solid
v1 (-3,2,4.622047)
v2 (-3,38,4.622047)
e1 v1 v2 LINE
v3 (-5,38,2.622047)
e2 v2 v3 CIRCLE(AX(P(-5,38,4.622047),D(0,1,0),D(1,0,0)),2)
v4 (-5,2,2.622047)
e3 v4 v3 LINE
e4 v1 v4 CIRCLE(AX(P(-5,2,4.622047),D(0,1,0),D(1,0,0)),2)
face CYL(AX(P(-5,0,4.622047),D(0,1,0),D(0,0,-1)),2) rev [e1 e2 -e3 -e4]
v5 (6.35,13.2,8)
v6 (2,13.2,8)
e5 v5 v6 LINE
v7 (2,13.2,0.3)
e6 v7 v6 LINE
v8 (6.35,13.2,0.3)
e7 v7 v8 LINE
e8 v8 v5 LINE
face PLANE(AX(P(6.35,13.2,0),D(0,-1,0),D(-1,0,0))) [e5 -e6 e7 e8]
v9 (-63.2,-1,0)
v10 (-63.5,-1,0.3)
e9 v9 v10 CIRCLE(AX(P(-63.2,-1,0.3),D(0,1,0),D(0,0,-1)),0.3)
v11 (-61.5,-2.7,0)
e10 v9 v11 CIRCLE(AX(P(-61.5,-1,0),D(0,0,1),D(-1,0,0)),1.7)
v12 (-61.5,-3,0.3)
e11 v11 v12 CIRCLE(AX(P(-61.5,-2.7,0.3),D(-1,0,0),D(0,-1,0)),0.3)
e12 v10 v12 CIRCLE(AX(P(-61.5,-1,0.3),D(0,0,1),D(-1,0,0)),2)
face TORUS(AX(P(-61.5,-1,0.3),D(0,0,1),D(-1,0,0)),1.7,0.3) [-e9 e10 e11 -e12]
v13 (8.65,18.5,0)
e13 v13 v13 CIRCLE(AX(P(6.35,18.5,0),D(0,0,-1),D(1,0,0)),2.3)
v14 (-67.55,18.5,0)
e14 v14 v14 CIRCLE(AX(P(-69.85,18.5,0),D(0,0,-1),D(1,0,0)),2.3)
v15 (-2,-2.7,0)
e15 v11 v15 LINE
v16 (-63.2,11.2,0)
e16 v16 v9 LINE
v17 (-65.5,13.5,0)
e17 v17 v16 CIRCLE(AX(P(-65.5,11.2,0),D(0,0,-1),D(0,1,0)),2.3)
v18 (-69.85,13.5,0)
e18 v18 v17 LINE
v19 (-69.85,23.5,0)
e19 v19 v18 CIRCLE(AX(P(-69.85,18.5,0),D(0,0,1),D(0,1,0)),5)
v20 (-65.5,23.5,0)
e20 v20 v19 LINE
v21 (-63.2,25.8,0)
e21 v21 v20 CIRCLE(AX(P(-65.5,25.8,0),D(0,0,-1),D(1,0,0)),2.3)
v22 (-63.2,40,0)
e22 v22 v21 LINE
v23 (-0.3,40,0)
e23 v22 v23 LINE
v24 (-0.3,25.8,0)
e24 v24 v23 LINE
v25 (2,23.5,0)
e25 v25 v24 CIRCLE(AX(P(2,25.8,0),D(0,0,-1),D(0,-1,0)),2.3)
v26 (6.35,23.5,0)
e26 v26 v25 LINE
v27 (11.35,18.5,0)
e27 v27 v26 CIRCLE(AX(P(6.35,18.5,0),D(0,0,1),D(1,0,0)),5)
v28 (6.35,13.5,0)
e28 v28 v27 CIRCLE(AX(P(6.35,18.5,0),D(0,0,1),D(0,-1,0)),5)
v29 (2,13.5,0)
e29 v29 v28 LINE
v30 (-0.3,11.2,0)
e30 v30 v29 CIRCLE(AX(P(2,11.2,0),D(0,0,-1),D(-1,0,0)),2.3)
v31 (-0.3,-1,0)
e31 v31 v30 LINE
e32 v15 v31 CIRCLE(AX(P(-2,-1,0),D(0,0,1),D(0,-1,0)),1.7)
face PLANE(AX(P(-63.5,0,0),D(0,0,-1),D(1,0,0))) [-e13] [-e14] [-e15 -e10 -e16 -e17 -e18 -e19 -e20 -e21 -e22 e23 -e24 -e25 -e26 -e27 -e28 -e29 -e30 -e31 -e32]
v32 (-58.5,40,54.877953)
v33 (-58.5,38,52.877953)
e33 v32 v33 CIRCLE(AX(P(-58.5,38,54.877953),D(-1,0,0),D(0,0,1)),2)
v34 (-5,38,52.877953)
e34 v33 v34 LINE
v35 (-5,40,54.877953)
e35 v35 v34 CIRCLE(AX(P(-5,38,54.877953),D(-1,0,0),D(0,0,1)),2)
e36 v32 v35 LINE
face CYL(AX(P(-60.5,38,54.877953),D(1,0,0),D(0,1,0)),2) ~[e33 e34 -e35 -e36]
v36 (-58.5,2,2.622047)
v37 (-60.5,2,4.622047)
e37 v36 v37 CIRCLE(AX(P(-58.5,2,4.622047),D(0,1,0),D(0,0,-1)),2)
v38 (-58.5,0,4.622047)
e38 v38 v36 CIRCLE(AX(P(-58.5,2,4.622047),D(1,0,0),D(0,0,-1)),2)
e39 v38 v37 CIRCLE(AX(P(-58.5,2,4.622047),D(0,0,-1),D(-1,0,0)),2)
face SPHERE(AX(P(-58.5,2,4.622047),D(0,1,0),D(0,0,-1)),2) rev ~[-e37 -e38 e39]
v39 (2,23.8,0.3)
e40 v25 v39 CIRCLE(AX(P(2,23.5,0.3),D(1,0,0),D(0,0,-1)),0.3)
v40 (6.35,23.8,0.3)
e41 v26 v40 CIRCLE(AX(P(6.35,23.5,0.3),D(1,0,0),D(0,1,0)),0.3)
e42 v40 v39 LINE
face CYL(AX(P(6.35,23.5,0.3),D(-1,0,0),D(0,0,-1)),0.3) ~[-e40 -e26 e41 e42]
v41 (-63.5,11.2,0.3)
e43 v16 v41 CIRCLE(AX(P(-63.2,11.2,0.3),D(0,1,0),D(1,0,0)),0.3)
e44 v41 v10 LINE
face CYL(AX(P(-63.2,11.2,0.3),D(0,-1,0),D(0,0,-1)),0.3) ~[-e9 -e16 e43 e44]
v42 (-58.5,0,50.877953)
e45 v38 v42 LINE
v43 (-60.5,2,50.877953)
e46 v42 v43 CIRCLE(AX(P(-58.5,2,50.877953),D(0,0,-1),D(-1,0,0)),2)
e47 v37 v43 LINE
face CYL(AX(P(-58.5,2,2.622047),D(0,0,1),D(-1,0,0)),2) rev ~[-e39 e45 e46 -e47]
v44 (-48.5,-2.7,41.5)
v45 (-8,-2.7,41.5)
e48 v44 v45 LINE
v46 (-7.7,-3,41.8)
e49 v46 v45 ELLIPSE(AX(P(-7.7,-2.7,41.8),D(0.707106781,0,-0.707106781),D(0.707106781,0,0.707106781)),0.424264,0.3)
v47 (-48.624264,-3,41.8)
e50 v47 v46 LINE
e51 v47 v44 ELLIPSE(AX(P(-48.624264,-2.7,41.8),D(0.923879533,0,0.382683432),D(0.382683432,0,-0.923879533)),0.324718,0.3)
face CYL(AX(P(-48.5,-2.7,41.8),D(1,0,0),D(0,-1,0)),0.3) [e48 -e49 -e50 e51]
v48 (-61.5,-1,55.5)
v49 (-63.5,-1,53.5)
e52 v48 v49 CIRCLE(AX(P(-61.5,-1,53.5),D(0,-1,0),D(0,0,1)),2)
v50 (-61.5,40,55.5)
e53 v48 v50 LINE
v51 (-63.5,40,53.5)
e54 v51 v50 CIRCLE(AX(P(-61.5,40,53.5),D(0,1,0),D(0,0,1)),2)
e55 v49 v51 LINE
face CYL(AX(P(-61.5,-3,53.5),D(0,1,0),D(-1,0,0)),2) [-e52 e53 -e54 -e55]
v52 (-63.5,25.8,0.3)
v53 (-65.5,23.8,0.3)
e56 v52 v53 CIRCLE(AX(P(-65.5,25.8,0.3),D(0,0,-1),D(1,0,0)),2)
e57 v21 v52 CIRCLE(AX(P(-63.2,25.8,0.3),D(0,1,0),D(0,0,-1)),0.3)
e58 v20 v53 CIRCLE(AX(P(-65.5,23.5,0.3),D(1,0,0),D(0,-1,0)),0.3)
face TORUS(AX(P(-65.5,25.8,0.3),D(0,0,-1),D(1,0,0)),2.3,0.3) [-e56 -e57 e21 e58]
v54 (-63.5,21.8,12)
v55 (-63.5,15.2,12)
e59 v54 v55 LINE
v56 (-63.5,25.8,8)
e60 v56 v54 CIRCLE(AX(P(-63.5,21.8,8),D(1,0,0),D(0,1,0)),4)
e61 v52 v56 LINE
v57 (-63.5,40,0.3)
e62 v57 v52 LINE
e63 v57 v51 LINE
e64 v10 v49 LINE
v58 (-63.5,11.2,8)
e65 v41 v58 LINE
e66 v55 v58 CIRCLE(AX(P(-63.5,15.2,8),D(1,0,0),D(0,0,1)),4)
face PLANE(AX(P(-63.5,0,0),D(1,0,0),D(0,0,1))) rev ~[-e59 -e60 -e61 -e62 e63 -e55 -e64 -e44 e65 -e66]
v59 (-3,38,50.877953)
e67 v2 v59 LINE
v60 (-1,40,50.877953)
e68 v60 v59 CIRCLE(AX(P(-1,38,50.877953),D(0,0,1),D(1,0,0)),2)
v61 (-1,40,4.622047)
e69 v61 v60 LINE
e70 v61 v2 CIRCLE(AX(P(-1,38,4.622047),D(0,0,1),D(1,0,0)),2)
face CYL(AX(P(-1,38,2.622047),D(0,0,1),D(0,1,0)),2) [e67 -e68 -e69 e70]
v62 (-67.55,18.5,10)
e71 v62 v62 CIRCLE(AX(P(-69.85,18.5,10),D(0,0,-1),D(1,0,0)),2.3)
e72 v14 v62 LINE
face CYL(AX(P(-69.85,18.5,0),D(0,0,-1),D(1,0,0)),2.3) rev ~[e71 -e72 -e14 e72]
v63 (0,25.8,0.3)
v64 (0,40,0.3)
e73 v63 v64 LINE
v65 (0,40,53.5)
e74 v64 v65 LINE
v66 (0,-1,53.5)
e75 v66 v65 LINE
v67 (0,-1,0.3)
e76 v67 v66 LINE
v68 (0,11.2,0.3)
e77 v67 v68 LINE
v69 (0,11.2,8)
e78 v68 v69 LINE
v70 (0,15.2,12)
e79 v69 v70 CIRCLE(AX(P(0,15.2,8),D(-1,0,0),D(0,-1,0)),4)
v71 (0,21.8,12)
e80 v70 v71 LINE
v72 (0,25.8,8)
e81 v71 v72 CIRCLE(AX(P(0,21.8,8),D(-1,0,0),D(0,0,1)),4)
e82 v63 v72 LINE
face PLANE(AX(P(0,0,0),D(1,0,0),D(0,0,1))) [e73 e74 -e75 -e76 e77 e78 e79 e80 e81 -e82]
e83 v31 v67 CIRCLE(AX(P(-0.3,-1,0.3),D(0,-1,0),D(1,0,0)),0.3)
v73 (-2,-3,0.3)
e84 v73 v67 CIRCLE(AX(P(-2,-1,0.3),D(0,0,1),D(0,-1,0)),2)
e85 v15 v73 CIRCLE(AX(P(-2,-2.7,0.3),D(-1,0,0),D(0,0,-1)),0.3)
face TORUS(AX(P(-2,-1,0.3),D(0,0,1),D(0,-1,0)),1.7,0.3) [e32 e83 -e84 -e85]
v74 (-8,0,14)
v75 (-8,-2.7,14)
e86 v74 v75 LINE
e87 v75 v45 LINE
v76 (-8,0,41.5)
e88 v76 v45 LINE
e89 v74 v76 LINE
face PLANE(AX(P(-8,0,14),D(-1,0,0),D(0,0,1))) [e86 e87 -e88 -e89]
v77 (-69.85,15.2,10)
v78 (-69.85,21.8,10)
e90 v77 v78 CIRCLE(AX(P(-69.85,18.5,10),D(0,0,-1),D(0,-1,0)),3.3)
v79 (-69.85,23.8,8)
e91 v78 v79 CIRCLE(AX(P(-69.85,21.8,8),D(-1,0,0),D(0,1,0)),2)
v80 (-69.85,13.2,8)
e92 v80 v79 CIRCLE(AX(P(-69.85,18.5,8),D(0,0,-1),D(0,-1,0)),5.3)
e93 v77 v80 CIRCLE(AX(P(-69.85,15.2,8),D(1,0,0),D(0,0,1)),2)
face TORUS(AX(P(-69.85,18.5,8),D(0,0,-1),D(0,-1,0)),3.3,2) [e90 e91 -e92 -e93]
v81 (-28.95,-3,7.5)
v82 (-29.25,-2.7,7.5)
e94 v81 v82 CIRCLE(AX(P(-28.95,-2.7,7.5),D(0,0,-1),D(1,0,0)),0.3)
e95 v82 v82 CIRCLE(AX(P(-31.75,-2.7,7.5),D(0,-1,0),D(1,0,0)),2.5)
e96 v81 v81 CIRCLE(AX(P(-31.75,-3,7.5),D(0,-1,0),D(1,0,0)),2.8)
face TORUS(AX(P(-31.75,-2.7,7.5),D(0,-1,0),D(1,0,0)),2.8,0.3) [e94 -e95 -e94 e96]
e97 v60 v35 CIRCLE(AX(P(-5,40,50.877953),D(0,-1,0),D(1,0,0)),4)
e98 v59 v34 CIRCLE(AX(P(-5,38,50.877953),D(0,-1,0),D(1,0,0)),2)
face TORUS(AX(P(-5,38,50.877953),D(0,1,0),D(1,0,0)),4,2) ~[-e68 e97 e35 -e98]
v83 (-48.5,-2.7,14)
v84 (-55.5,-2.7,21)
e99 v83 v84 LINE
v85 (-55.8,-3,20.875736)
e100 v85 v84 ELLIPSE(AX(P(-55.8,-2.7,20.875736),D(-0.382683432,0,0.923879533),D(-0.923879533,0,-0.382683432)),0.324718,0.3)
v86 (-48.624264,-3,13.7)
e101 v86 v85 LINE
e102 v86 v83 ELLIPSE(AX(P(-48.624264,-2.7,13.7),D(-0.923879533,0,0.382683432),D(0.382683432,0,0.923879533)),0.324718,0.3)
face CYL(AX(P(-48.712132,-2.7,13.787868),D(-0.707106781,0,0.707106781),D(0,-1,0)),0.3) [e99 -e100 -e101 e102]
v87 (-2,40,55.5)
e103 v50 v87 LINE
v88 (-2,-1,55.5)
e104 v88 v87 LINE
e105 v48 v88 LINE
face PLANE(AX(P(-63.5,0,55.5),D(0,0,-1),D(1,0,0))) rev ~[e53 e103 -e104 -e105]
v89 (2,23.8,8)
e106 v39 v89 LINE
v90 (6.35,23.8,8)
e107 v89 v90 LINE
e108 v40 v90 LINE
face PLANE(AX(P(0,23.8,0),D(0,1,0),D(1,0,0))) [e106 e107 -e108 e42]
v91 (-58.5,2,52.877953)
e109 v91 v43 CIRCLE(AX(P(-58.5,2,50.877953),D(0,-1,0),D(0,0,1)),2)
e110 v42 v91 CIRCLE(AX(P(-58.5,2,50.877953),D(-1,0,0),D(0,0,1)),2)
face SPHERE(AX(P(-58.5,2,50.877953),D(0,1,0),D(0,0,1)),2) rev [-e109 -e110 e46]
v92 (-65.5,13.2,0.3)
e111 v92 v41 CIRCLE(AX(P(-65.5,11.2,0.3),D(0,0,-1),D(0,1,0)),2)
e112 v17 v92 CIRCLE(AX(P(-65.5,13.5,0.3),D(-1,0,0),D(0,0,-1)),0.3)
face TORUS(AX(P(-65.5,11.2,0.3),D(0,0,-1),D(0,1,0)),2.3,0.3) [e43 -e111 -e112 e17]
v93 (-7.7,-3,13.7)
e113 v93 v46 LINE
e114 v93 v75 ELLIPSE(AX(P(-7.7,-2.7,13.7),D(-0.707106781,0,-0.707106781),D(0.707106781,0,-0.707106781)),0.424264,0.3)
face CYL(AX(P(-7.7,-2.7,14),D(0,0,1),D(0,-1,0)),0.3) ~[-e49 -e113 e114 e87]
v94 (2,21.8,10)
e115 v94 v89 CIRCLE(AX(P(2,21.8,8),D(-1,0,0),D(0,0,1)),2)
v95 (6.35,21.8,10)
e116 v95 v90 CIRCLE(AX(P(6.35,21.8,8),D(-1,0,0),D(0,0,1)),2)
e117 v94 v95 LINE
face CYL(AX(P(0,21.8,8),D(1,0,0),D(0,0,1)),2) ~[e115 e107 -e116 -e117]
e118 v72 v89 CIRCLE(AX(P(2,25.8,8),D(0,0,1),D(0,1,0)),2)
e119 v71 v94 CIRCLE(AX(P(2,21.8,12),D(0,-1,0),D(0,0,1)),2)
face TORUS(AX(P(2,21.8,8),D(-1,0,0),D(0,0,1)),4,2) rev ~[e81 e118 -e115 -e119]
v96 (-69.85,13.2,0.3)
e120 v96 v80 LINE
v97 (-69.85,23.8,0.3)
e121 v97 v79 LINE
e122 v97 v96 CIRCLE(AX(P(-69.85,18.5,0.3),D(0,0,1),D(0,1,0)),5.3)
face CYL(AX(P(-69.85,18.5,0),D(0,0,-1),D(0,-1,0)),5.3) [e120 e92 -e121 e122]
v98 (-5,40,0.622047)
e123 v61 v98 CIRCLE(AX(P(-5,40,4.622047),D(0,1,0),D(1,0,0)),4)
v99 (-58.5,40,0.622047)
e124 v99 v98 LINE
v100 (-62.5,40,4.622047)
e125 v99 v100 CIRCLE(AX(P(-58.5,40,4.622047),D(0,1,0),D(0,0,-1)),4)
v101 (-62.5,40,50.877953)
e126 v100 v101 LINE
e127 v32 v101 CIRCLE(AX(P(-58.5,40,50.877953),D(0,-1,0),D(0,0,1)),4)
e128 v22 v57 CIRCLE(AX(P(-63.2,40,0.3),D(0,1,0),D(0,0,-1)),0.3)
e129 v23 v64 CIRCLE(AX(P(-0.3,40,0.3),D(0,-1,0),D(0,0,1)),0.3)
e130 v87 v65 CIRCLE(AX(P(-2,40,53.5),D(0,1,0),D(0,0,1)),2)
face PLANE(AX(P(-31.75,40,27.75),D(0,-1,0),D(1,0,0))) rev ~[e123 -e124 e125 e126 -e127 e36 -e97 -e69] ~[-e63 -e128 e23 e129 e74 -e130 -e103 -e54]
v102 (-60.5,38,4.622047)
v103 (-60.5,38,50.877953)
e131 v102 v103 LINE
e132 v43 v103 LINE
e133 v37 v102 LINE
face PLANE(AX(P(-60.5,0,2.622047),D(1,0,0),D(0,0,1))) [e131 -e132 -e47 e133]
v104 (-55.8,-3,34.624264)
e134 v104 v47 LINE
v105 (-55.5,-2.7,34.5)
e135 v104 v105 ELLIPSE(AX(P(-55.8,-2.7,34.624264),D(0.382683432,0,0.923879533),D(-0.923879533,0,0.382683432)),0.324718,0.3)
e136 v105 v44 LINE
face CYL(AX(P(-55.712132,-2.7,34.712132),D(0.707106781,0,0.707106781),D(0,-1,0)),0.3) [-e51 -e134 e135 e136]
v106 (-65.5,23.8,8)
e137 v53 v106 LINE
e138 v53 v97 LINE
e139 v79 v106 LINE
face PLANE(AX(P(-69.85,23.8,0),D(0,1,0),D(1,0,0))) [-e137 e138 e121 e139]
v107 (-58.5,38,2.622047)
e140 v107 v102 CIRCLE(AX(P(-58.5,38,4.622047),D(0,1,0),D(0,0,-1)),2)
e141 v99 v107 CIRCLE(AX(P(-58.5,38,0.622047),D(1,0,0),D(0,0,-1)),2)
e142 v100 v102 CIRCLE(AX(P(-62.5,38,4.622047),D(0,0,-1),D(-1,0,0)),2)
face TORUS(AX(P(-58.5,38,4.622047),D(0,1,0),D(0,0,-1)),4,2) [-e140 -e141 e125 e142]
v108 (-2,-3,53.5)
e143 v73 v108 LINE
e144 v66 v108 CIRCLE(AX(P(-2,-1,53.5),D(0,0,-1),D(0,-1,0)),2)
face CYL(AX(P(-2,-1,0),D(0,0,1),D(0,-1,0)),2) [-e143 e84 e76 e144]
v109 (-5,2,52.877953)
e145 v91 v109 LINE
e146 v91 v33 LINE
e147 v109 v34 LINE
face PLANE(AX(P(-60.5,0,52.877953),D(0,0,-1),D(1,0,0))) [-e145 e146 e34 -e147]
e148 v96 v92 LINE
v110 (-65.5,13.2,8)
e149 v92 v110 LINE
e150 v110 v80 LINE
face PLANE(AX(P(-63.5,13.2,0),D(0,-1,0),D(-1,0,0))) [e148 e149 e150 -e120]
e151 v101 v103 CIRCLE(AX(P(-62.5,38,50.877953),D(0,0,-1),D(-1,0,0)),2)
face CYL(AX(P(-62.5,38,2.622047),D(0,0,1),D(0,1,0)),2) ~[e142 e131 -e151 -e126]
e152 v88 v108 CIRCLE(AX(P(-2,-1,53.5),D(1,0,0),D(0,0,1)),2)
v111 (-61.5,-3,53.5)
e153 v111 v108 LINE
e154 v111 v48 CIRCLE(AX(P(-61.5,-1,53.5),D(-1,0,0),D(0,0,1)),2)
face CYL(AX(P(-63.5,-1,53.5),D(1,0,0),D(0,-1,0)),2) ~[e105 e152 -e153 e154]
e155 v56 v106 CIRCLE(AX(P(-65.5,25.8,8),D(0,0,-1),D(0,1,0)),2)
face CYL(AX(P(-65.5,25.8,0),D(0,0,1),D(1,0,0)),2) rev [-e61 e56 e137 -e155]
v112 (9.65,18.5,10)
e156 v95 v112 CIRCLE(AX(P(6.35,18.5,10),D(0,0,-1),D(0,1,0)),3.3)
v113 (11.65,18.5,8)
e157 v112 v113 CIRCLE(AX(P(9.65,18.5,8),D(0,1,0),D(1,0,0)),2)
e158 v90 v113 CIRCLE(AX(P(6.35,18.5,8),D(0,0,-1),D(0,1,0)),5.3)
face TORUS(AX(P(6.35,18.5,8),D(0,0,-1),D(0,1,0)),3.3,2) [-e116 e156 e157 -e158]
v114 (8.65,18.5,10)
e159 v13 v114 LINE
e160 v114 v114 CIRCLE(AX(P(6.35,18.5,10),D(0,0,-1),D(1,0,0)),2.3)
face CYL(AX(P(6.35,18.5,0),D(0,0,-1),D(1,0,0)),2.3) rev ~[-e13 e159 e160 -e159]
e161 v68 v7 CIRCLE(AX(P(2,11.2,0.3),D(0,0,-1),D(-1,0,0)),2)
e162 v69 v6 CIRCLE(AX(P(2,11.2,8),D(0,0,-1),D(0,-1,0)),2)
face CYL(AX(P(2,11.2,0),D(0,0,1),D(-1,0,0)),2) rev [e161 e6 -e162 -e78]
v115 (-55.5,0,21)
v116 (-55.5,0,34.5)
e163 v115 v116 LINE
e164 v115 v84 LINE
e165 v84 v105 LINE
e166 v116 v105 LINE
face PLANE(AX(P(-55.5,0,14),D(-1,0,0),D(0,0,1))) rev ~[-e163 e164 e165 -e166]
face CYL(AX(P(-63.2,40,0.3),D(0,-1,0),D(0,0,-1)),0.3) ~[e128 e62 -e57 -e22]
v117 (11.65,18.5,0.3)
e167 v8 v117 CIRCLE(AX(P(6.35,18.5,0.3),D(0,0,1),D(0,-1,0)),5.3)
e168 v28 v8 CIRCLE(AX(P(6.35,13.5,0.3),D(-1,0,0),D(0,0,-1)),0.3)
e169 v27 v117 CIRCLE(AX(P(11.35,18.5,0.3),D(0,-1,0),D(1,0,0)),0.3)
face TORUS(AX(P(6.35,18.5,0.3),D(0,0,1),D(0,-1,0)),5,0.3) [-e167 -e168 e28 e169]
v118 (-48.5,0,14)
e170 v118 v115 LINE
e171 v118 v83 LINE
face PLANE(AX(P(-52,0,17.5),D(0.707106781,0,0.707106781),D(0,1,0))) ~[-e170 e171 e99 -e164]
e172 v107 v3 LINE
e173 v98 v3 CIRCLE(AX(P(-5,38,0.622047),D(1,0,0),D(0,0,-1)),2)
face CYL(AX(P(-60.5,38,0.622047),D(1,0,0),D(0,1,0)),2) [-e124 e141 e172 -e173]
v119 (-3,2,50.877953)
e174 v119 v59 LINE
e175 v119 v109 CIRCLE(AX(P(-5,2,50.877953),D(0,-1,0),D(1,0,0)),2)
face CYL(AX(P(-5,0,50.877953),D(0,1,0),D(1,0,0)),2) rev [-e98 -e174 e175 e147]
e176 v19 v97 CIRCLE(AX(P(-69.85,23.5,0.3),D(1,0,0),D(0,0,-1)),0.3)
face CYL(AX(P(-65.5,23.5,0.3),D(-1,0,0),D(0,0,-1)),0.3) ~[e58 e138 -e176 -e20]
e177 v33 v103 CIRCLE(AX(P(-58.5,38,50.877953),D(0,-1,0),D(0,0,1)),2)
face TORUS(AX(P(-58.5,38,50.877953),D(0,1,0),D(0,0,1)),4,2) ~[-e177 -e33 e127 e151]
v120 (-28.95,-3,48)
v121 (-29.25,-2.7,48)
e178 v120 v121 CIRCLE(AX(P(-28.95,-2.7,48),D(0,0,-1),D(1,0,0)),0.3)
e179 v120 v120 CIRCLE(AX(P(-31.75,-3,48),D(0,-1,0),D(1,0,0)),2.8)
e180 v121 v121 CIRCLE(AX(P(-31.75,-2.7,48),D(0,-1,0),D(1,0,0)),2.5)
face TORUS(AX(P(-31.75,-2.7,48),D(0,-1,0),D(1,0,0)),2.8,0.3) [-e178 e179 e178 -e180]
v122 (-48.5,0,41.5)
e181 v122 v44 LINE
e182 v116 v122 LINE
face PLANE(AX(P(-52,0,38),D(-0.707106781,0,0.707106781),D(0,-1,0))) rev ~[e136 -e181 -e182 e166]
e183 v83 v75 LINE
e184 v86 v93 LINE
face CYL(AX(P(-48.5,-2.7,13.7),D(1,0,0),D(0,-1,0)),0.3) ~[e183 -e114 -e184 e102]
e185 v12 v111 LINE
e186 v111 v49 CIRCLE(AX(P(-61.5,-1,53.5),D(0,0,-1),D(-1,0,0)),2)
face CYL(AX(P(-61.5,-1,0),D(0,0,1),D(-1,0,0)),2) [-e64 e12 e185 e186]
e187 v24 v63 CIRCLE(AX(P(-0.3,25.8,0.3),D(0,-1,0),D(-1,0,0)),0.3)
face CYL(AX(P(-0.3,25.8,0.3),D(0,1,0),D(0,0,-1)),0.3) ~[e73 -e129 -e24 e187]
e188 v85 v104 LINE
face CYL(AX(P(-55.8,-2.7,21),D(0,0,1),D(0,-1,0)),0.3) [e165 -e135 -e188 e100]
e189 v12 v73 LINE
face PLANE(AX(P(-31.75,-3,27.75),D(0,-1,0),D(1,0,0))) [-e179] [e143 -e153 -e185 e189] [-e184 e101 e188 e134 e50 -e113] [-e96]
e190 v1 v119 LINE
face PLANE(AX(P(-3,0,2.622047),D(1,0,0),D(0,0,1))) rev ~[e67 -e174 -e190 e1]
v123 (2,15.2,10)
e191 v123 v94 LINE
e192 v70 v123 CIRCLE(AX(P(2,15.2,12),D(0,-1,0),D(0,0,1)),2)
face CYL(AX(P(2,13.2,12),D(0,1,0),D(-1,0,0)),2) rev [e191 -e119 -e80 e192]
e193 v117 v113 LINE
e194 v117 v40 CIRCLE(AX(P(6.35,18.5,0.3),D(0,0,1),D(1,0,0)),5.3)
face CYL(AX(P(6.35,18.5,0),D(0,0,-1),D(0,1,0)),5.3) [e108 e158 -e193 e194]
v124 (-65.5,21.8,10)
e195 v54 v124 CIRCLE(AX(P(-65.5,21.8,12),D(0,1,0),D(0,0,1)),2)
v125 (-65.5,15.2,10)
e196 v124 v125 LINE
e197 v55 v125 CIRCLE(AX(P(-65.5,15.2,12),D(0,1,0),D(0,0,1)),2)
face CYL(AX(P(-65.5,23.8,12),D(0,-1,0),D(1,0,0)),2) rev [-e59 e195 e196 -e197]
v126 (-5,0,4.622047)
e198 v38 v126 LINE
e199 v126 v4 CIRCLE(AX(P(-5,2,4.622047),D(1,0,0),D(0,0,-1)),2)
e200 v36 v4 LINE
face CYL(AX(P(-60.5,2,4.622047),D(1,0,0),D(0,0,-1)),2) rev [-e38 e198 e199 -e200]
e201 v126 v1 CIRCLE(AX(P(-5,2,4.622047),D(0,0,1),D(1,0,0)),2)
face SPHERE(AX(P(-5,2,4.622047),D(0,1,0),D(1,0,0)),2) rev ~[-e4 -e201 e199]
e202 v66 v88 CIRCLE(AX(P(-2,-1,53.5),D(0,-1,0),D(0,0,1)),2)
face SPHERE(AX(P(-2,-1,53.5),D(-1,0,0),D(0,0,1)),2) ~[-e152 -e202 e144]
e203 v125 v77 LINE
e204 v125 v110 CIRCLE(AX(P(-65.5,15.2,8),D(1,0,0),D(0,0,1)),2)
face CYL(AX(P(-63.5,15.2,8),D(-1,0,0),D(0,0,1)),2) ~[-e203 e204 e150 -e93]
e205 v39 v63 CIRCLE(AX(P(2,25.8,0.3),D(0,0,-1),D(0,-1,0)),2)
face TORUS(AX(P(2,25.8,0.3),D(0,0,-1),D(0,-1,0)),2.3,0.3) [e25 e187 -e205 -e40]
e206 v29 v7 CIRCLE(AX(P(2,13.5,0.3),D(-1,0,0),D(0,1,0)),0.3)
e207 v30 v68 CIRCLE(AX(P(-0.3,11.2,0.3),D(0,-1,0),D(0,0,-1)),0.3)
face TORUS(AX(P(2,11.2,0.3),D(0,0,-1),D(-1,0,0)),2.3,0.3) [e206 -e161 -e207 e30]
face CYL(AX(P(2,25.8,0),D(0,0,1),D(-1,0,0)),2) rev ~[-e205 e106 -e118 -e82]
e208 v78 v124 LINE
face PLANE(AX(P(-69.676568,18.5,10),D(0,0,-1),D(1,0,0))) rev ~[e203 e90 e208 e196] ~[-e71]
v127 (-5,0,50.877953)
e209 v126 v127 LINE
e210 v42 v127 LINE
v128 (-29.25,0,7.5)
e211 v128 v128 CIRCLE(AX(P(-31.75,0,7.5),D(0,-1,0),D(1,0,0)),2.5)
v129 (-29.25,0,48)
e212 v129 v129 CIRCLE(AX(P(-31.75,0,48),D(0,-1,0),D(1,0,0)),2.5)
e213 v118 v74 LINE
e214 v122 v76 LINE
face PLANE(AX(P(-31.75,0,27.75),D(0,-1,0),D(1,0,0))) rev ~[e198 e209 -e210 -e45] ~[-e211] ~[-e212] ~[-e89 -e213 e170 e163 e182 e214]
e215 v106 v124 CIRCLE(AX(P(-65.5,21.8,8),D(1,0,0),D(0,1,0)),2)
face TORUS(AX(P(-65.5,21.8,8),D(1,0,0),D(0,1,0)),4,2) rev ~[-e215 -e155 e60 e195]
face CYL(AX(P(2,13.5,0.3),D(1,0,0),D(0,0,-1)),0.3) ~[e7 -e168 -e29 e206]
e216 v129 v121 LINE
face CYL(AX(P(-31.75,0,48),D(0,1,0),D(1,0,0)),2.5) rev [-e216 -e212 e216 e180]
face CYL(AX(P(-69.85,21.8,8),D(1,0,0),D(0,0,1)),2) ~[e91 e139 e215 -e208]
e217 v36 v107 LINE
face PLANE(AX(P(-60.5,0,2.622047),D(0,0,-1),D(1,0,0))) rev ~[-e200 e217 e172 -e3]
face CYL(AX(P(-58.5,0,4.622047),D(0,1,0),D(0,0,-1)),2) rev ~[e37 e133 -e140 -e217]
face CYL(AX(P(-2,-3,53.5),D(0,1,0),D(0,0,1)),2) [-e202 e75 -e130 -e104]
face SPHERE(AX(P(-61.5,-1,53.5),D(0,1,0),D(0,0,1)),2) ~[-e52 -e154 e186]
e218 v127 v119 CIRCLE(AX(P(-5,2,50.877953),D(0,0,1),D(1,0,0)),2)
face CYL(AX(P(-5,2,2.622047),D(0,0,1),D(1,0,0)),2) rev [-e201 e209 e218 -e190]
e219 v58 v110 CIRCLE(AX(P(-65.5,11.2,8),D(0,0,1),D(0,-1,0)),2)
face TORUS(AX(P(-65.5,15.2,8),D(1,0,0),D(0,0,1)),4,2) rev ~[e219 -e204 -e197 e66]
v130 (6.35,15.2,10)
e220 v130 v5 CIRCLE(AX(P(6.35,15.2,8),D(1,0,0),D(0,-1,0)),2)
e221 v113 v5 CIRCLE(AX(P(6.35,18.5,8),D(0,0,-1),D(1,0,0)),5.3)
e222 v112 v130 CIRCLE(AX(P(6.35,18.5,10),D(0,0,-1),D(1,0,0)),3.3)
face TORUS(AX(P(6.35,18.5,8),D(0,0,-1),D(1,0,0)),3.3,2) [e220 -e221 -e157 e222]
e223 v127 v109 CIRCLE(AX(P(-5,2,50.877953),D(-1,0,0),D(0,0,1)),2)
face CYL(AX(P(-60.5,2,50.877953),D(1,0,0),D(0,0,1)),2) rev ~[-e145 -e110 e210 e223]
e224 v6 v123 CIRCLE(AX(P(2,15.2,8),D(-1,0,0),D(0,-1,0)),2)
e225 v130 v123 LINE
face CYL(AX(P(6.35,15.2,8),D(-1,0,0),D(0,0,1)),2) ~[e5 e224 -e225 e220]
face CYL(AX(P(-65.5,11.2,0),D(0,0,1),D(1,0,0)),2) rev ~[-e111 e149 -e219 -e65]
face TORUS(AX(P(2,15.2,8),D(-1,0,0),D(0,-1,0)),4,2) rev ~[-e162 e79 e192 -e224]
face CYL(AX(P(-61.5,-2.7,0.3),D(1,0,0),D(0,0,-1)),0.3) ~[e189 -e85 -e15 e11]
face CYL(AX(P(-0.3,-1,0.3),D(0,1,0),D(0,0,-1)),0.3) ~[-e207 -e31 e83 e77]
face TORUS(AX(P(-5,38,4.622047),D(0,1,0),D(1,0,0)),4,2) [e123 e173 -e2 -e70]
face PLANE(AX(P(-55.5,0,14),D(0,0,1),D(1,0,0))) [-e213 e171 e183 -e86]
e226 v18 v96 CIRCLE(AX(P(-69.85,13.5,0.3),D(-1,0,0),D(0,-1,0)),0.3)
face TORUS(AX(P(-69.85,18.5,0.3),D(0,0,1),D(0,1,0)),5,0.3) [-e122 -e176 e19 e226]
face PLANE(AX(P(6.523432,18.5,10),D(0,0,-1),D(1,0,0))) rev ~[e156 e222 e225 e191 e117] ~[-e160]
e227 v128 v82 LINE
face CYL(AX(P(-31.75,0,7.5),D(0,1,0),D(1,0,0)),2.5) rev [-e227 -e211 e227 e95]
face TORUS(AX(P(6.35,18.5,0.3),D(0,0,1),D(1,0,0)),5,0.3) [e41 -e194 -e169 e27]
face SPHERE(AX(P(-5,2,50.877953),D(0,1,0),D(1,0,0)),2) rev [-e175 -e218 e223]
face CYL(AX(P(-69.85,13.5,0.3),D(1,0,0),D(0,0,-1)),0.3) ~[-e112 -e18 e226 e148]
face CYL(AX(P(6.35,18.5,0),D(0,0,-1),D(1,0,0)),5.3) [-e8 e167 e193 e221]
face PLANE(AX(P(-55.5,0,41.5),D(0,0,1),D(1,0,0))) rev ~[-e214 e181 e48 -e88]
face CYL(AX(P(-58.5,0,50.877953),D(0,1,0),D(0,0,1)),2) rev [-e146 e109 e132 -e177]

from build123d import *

# Parameters (mm, degrees)
F0_W     = 63.5
F0_H     = 55.5
F0_W_2   = 57.5
F0_H_2   = 50.2559055118
F0_R     = 2.5
F0_W_3   = 47.5
F0_H_3   = 27.5
F1_DEPTH = 3
F2_SIZE  = 7
F3_DEPTH = 40
F4_R     = 2.3
F5_DEPTH = 10
F6_R     = 2
F7_R     = 0.3


with BuildPart() as f1:
    # F0 (on Front) → F1 (new body)
    with BuildSketch(Plane.XZ):
        with Locations((-31.75, 27.75)):
            Rectangle(F0_W, F0_H)
        with Locations((-31.75, 27.75)):
            Rectangle(F0_W_2, F0_H_2, mode=Mode.SUBTRACT)
        with Locations((-31.75, 27.75)):
            Rectangle(F0_W_2, F0_H_2)
        with Locations((-31.75, 7.5)):
            Circle(F0_R, mode=Mode.SUBTRACT)
        with Locations((-31.75, 27.75)):
            Rectangle(F0_W_3, F0_H_3, mode=Mode.SUBTRACT)
        with Locations((-31.75, 48)):
            Circle(F0_R, mode=Mode.SUBTRACT)
    extrude(amount=F1_DEPTH)

    # F2
    f2_edges = [f1.edges().sort_by_distance(p)[0] for p in [
        (-55.5, -1.5, 41.5),
        (-55.5, -1.5, 14),
    ]]
    chamfer(f2_edges, length=F2_SIZE)

    # F0 (on Front) → F3 (join)
    with BuildSketch(Plane.XZ):
        with Locations((-31.75, 27.75)):
            Rectangle(F0_W, F0_H)
        with Locations((-31.75, 27.75)):
            Rectangle(F0_W_2, F0_H_2, mode=Mode.SUBTRACT)
    extrude(amount=-F3_DEPTH)

    # F4 (on face) → F5 (join)
    with BuildSketch(Plane(origin=(0, 0, 0), x_dir=(1, 0, 0), z_dir=(0, 0, -1))):
        with BuildLine():
            ThreePointArc((-69.85, -23.8), (-66.1023340597, -22.2476659403), (-64.55, -18.5))
            ThreePointArc((-64.55, -18.5), (-66.1023340597, -14.7523340597), (-69.85, -13.2))
            ThreePointArc((-69.85, -13.2), (-75.15, -18.5), (-69.85, -23.8))
        make_face()
        with Locations((-69.85, -18.5)):
            Circle(F4_R, mode=Mode.SUBTRACT)
        with BuildLine():
            ThreePointArc((6.35, -23.8), (10.0976659403, -22.2476659403), (11.65, -18.5))
            ThreePointArc((11.65, -18.5), (10.0976659403, -14.7523340597), (6.35, -13.2))
            ThreePointArc((6.35, -13.2), (1.05, -18.5), (6.35, -23.8))
        make_face()
        with Locations((6.35, -18.5)):
            Circle(F4_R, mode=Mode.SUBTRACT)
        with BuildLine():
            ThreePointArc((-69.85, -13.2), (-66.1023340597, -14.7523340597), (-64.55, -18.5))
            ThreePointArc((-64.55, -18.5), (-66.1023340597, -22.2476659403), (-69.85, -23.8))
            Line((-69.85, -23.8), (-63.5, -23.8))
            Line((-63.5, -23.8), (-63.5, -13.2))
            Line((-63.5, -13.2), (-69.85, -13.2))
        make_face()
        with BuildLine():
            Line((6.35, -13.2), (0, -13.2))
            Line((0, -13.2), (0, -23.8))
            Line((0, -23.8), (6.35, -23.8))
            ThreePointArc((6.35, -23.8), (1.05, -18.5), (6.35, -13.2))
        make_face()
    extrude(amount=-F5_DEPTH)

    # F6
    f6_edges = [f1.edges().sort_by_distance(p)[0] for p in [
        (-3, 20, 52.877953),
        (-3, 20, 2.622047),
        (-3, 0, 27.75),
        (-3, 40, 27.75),
        (-60.5, 20, 2.622047),
        (-31.75, 0, 2.622047),
        (-31.75, 40, 2.622047),
        (-60.5, 20, 52.877953),
        (-31.75, 0, 52.877953),
        (-31.75, 40, 52.877953),
        (-60.5, 0, 27.75),
        (-60.5, 40, 27.75),
        (-63.5, 18.5, 55.5),
        (-75.15, 18.5, 10),
        (-31.75, -3, 55.5),
        (0, 18.5, 55.5),
        (11.65, 18.5, 10),
        (0, -3, 27.75),
        (-63.5, -3, 27.75),
        (0, 13.2, 5),
        (0, 18.5, 10),
        (0, 23.8, 5),
        (-63.5, 23.8, 5),
        (-63.5, 18.5, 10),
        (-63.5, 13.2, 5),
        (3.175, 13.2, 10),
        (3.175, 23.8, 10),
        (-66.675, 23.8, 10),
        (-66.675, 13.2, 10),
    ]]
    fillet(f6_edges, radius=F6_R)

    # F7
    f7_edges = [f1.edges().sort_by_distance(p)[0] for p in [
        (-31.75, -3, 0),
        (-61.5, -3, 26.75),
        (-2, -3, 26.75),
        (-31.75, -3, 53.5),
        (-28.25, -3, 14),
        (-52, -3, 17.5),
        (-8, -3, 27.75),
        (-55.5, -3, 27.75),
        (-28.25, -3, 41.5),
        (-52, -3, 38),
        (-34.25, -3, 48),
        (-34.25, -3, 7.5),
        (-63.5, 5.1, 0),
        (-62.914214, -2.414214, 0),
        (-64.085786, 12.614214, 0),
        (-67.675, 13.2, 0),
        (-0.585786, -2.414214, 0),
        (-75.15, 18.5, 0),
        (0, 5.1, 0),
        (-67.675, 23.8, 0),
        (0.585786, 12.614214, 0),
        (-64.085786, 24.385786, 0),
        (4.175, 13.2, 0),
        (-63.5, 32.9, 0),
        (11.65, 18.5, 0),
        (4.175, 23.8, 0),
        (0, 32.9, 0),
        (0.585786, 24.385786, 0),
    ]]
    fillet(f7_edges, radius=F7_R)


solid = f1.part
